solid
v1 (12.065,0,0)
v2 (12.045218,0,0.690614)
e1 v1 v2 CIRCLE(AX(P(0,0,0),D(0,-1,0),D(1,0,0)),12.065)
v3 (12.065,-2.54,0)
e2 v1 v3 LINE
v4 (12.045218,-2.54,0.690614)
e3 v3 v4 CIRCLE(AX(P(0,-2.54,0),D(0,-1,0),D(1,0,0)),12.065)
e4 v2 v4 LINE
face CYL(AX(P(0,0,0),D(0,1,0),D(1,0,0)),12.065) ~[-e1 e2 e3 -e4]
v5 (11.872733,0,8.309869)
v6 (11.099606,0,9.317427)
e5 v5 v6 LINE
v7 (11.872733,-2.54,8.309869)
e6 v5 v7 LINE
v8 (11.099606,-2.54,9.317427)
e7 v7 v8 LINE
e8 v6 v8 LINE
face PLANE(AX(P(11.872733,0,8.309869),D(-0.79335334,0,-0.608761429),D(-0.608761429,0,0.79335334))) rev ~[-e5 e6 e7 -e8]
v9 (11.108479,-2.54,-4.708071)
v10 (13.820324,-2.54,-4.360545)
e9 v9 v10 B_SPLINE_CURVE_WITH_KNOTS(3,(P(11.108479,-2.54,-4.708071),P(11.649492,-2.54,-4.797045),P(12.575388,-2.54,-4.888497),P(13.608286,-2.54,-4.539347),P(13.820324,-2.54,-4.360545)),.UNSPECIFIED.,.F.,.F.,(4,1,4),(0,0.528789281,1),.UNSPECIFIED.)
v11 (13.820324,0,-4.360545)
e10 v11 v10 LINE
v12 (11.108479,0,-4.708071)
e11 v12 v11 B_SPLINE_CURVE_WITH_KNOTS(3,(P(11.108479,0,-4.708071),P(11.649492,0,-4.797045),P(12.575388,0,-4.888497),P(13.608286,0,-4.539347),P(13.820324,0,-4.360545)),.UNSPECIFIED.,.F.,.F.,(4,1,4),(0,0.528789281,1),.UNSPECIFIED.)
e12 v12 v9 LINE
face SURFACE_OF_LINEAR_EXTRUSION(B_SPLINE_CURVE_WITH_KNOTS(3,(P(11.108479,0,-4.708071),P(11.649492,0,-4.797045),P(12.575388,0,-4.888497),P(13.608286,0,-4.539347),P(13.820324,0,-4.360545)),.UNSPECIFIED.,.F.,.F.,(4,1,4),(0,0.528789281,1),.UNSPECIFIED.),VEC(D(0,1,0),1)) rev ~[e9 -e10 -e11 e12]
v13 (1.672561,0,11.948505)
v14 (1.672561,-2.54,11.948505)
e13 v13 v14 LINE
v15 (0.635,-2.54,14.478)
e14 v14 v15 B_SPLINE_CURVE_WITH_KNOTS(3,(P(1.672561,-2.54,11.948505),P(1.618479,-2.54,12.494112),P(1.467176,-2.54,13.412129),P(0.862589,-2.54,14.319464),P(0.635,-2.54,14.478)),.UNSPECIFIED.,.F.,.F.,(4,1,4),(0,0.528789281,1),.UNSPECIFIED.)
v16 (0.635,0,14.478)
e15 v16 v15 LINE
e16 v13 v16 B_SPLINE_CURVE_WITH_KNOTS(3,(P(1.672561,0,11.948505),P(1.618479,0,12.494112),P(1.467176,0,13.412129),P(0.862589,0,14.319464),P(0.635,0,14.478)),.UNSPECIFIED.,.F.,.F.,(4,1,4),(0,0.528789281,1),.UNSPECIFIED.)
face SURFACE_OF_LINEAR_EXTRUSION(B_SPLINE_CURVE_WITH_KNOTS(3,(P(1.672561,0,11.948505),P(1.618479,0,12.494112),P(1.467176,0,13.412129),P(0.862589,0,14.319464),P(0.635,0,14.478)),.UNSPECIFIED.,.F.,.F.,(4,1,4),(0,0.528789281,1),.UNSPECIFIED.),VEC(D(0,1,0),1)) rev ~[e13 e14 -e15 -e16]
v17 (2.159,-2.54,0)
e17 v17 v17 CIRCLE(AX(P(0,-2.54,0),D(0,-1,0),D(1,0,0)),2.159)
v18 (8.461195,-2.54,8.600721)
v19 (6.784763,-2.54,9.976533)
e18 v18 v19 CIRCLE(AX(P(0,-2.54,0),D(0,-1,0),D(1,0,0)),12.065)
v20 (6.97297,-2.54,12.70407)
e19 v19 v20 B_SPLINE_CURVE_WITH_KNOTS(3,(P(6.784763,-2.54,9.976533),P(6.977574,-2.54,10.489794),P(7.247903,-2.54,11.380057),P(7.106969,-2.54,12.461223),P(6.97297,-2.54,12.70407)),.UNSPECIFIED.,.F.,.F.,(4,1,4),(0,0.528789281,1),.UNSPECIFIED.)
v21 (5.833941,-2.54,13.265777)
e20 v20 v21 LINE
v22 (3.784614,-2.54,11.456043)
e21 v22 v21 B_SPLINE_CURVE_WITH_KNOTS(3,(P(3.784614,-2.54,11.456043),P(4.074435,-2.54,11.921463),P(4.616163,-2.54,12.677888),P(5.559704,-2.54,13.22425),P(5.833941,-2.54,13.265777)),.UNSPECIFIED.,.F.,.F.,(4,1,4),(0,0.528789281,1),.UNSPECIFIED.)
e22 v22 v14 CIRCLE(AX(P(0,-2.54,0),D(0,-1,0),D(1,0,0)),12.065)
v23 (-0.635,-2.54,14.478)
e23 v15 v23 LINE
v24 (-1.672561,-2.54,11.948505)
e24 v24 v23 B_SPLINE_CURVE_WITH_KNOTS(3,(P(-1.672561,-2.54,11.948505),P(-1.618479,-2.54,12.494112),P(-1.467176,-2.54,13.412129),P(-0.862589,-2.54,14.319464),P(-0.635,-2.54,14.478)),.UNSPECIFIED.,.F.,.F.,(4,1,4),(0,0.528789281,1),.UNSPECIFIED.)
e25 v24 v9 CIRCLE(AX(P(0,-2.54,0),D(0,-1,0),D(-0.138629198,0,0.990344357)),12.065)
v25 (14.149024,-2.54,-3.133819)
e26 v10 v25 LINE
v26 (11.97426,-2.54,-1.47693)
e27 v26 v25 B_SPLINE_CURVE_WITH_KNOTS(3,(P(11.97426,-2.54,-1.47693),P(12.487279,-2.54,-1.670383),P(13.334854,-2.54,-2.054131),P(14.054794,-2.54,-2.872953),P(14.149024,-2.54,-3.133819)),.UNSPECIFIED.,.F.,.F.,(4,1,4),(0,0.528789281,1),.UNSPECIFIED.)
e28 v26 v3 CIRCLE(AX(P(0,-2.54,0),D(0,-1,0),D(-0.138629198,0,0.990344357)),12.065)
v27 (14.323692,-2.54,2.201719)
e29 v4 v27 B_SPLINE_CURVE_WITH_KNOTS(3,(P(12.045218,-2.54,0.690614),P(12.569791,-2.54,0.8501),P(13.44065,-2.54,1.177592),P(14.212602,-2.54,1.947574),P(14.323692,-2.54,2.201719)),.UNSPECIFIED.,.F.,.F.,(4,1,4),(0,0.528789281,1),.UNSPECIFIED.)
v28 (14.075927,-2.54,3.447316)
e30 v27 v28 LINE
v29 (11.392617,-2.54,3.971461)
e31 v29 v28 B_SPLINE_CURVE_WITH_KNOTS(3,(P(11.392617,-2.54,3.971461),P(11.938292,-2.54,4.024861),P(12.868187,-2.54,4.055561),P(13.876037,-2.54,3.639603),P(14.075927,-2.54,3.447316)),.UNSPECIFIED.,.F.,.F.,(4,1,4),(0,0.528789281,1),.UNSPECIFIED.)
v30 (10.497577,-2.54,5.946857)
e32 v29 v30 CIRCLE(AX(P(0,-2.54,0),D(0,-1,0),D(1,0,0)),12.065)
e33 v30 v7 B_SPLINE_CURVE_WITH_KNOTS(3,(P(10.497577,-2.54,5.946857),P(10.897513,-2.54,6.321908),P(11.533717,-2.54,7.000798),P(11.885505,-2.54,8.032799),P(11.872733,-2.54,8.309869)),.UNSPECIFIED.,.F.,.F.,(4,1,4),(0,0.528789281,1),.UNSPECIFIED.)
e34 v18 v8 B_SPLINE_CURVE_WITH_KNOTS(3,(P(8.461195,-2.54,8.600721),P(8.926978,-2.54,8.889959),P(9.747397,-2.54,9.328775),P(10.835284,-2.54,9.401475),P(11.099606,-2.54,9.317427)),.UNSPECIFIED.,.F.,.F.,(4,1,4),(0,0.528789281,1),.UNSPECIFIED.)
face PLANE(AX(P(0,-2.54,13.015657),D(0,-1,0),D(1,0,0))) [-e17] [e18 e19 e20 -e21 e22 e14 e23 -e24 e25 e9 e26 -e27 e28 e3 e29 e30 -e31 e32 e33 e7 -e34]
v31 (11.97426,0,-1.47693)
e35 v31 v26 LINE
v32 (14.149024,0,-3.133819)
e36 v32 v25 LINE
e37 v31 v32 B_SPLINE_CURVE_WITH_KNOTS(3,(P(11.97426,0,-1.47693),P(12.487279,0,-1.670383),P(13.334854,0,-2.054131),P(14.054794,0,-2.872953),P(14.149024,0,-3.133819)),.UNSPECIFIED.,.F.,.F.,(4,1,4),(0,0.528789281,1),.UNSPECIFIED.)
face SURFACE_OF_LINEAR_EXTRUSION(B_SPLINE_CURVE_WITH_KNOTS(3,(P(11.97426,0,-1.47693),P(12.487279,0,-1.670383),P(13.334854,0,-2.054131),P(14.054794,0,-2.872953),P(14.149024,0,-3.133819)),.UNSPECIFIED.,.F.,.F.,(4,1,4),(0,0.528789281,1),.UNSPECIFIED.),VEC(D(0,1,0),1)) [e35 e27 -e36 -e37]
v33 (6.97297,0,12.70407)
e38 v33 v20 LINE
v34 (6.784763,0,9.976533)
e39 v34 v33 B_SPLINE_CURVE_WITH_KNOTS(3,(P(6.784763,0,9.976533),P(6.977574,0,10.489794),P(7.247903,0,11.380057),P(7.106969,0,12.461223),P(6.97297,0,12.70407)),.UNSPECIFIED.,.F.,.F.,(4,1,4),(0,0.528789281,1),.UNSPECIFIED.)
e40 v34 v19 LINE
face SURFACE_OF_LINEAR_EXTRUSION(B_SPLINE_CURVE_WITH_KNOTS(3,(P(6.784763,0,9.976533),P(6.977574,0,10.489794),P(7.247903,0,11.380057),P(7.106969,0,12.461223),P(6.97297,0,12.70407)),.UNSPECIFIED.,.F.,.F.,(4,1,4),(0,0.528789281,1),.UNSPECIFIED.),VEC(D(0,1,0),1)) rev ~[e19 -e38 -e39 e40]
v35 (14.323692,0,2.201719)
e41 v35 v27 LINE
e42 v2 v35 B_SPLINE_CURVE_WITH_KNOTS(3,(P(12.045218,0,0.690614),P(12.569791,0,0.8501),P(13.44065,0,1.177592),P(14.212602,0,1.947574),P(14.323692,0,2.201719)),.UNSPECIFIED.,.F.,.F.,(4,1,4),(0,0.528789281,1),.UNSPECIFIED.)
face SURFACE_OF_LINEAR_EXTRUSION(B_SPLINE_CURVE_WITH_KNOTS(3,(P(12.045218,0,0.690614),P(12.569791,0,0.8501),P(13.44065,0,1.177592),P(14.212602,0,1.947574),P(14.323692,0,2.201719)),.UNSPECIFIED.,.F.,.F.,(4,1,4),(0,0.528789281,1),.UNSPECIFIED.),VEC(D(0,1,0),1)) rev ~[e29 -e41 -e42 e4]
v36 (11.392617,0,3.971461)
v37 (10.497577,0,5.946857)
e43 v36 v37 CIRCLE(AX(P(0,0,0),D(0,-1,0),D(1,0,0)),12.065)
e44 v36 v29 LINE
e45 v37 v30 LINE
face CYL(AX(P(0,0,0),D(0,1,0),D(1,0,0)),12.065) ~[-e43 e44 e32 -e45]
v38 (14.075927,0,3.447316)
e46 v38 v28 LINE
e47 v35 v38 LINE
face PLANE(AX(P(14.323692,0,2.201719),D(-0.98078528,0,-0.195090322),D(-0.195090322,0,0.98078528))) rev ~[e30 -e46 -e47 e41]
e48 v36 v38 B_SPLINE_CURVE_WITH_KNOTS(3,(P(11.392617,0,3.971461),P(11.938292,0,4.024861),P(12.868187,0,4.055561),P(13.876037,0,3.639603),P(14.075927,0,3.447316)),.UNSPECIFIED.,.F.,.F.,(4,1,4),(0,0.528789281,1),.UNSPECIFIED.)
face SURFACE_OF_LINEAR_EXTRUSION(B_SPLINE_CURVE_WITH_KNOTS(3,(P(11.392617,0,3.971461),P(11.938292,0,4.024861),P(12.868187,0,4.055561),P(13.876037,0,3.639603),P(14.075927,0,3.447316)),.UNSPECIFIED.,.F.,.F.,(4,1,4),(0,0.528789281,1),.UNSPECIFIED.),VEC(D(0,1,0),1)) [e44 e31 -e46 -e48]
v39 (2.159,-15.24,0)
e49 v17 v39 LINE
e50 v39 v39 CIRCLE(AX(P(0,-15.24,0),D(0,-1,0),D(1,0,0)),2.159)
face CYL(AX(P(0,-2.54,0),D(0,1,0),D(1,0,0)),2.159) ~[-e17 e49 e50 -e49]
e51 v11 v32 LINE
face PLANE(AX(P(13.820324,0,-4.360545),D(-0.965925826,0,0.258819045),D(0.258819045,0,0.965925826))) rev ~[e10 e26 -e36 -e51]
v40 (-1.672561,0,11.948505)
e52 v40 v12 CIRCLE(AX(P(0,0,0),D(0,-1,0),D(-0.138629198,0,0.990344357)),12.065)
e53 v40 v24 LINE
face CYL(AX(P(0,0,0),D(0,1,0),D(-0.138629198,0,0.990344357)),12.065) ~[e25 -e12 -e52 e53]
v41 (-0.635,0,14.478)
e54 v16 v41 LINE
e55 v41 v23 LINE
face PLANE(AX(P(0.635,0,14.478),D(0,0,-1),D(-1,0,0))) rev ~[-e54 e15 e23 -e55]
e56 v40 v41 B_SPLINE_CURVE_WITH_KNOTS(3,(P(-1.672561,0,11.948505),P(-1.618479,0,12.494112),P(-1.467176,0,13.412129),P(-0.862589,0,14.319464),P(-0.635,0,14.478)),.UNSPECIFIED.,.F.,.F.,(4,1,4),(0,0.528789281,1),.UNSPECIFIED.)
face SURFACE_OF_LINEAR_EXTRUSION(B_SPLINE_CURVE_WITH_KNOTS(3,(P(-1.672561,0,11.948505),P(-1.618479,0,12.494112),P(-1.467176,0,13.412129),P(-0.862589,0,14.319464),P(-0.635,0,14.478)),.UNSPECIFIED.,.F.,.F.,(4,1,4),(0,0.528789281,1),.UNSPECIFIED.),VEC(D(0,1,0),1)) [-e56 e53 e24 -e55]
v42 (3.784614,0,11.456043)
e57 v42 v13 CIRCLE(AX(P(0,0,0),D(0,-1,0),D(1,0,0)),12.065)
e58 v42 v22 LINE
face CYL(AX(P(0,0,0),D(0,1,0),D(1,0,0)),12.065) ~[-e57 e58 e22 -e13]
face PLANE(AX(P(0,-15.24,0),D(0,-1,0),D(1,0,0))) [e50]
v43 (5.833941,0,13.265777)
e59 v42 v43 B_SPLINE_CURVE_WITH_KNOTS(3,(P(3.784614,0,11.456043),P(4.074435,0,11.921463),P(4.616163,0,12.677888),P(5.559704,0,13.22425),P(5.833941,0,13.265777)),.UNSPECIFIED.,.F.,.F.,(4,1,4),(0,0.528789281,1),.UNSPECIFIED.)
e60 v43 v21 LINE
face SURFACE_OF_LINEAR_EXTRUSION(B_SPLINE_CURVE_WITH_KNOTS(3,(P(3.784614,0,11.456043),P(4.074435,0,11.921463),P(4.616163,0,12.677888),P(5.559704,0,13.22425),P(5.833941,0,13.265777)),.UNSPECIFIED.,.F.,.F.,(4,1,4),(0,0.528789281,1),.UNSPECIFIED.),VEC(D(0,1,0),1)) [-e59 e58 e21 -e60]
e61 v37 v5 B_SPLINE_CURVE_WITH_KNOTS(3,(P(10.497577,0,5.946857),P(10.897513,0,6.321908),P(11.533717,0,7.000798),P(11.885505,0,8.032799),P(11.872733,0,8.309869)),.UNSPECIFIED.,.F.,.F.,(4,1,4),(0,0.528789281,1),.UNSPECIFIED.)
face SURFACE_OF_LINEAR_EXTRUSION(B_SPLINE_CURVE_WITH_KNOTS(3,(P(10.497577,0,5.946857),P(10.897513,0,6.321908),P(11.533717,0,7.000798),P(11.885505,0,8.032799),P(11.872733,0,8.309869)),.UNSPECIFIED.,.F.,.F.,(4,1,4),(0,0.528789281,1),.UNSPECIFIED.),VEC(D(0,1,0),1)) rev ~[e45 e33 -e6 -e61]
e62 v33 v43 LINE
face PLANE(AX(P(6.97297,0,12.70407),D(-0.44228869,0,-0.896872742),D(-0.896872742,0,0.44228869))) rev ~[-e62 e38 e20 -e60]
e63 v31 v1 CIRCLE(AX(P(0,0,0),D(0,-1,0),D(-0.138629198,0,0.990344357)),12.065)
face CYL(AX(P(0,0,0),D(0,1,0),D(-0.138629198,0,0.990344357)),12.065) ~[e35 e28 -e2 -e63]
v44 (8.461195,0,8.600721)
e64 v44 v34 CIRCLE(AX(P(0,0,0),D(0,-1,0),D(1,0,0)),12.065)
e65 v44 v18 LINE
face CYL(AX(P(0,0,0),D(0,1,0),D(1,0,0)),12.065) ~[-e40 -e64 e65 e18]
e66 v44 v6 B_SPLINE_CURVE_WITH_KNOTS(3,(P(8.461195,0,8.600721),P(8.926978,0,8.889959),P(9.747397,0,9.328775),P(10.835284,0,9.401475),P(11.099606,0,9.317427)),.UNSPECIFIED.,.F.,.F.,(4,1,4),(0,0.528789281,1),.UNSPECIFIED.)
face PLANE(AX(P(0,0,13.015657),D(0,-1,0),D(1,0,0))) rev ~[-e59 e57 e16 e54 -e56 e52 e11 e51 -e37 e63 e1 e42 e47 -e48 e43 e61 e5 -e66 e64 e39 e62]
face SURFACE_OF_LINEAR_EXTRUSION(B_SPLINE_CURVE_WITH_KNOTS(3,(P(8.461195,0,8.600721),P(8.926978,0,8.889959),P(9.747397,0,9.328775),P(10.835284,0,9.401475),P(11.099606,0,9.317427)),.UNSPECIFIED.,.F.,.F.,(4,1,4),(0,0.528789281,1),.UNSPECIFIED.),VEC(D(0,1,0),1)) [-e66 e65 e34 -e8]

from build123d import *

# Parameters (mm, degrees)
F1_DEPTH        = 2.54
F2_DEPTH        = 2.54
F2_COPIES_COUNT = 5
F2_COPIES_ANGLE = 105
F3_R            = 2.159
F4_DEPTH        = 12.7


# Not quite as in the source:
# - a pattern or mirror of a feature is missing from the dataset's text; its kind, count and spacing are read off the source's solid


with BuildPart() as f1:
    # F0 (on Front) → F1 (new body)
    with BuildSketch(Plane.XZ):
        with BuildLine():
            ThreePointArc((-1.6725612742, 11.9485046673), (-7.917852399, -9.1033970795), (12.065, 0))
            ThreePointArc((12.065, 0), (9.1033970795, 7.917852399), (1.6725612742, 11.9485046673))
            ThreePointArc((1.6725612742, 11.9485046673), (0, 12.065), (-1.6725612742, 11.9485046673))
        make_face()
    extrude(amount=F1_DEPTH)

    # F0 (on Front) → F2 (join, through all)
    with BuildSketch(Plane.XZ):
        with BuildLine():
            ThreePointArc((-1.6725612742, 11.9485046673), (0, 12.065), (1.6725612742, 11.9485046673))
            add(Edge.make_bspline(
                [(1.6725612742, 11.9485046673), (1.6184790505, 12.4941120183), (1.4671756256, 13.4121286243), (0.8625889567, 14.3194638744), (0.635, 14.478)],
                knots=[0, 0, 0, 0, 0.5287892811, 1, 1, 1, 1], degree=3))
            Line((0.635, 14.478), (-0.635, 14.478))
            add(Edge.make_bspline(
                [(-1.6725612742, 11.9485046673), (-1.6184790505, 12.4941120183), (-1.4671756256, 13.4121286243), (-0.8625889567, 14.3194638744), (-0.635, 14.478)],
                knots=[0, 0, 0, 0, 0.5287892811, 1, 1, 1, 1], degree=3))
        make_face()
    f2 = extrude(amount=F2_DEPTH)

    # F2_copies: F2 ×5 about axis
    f2_copies_axis = Axis((0, 0, 0), (0, 1, 0))
    for i in range(1, F2_COPIES_COUNT):
        add(f2.rotate(f2_copies_axis, i * F2_COPIES_ANGLE / (F2_COPIES_COUNT - 1)))

    # F3 (on face) → F4 (join)
    with BuildSketch(Plane.XZ.offset(2.54)):
        Circle(F3_R)
    extrude(amount=F4_DEPTH)


solid = f1.part
